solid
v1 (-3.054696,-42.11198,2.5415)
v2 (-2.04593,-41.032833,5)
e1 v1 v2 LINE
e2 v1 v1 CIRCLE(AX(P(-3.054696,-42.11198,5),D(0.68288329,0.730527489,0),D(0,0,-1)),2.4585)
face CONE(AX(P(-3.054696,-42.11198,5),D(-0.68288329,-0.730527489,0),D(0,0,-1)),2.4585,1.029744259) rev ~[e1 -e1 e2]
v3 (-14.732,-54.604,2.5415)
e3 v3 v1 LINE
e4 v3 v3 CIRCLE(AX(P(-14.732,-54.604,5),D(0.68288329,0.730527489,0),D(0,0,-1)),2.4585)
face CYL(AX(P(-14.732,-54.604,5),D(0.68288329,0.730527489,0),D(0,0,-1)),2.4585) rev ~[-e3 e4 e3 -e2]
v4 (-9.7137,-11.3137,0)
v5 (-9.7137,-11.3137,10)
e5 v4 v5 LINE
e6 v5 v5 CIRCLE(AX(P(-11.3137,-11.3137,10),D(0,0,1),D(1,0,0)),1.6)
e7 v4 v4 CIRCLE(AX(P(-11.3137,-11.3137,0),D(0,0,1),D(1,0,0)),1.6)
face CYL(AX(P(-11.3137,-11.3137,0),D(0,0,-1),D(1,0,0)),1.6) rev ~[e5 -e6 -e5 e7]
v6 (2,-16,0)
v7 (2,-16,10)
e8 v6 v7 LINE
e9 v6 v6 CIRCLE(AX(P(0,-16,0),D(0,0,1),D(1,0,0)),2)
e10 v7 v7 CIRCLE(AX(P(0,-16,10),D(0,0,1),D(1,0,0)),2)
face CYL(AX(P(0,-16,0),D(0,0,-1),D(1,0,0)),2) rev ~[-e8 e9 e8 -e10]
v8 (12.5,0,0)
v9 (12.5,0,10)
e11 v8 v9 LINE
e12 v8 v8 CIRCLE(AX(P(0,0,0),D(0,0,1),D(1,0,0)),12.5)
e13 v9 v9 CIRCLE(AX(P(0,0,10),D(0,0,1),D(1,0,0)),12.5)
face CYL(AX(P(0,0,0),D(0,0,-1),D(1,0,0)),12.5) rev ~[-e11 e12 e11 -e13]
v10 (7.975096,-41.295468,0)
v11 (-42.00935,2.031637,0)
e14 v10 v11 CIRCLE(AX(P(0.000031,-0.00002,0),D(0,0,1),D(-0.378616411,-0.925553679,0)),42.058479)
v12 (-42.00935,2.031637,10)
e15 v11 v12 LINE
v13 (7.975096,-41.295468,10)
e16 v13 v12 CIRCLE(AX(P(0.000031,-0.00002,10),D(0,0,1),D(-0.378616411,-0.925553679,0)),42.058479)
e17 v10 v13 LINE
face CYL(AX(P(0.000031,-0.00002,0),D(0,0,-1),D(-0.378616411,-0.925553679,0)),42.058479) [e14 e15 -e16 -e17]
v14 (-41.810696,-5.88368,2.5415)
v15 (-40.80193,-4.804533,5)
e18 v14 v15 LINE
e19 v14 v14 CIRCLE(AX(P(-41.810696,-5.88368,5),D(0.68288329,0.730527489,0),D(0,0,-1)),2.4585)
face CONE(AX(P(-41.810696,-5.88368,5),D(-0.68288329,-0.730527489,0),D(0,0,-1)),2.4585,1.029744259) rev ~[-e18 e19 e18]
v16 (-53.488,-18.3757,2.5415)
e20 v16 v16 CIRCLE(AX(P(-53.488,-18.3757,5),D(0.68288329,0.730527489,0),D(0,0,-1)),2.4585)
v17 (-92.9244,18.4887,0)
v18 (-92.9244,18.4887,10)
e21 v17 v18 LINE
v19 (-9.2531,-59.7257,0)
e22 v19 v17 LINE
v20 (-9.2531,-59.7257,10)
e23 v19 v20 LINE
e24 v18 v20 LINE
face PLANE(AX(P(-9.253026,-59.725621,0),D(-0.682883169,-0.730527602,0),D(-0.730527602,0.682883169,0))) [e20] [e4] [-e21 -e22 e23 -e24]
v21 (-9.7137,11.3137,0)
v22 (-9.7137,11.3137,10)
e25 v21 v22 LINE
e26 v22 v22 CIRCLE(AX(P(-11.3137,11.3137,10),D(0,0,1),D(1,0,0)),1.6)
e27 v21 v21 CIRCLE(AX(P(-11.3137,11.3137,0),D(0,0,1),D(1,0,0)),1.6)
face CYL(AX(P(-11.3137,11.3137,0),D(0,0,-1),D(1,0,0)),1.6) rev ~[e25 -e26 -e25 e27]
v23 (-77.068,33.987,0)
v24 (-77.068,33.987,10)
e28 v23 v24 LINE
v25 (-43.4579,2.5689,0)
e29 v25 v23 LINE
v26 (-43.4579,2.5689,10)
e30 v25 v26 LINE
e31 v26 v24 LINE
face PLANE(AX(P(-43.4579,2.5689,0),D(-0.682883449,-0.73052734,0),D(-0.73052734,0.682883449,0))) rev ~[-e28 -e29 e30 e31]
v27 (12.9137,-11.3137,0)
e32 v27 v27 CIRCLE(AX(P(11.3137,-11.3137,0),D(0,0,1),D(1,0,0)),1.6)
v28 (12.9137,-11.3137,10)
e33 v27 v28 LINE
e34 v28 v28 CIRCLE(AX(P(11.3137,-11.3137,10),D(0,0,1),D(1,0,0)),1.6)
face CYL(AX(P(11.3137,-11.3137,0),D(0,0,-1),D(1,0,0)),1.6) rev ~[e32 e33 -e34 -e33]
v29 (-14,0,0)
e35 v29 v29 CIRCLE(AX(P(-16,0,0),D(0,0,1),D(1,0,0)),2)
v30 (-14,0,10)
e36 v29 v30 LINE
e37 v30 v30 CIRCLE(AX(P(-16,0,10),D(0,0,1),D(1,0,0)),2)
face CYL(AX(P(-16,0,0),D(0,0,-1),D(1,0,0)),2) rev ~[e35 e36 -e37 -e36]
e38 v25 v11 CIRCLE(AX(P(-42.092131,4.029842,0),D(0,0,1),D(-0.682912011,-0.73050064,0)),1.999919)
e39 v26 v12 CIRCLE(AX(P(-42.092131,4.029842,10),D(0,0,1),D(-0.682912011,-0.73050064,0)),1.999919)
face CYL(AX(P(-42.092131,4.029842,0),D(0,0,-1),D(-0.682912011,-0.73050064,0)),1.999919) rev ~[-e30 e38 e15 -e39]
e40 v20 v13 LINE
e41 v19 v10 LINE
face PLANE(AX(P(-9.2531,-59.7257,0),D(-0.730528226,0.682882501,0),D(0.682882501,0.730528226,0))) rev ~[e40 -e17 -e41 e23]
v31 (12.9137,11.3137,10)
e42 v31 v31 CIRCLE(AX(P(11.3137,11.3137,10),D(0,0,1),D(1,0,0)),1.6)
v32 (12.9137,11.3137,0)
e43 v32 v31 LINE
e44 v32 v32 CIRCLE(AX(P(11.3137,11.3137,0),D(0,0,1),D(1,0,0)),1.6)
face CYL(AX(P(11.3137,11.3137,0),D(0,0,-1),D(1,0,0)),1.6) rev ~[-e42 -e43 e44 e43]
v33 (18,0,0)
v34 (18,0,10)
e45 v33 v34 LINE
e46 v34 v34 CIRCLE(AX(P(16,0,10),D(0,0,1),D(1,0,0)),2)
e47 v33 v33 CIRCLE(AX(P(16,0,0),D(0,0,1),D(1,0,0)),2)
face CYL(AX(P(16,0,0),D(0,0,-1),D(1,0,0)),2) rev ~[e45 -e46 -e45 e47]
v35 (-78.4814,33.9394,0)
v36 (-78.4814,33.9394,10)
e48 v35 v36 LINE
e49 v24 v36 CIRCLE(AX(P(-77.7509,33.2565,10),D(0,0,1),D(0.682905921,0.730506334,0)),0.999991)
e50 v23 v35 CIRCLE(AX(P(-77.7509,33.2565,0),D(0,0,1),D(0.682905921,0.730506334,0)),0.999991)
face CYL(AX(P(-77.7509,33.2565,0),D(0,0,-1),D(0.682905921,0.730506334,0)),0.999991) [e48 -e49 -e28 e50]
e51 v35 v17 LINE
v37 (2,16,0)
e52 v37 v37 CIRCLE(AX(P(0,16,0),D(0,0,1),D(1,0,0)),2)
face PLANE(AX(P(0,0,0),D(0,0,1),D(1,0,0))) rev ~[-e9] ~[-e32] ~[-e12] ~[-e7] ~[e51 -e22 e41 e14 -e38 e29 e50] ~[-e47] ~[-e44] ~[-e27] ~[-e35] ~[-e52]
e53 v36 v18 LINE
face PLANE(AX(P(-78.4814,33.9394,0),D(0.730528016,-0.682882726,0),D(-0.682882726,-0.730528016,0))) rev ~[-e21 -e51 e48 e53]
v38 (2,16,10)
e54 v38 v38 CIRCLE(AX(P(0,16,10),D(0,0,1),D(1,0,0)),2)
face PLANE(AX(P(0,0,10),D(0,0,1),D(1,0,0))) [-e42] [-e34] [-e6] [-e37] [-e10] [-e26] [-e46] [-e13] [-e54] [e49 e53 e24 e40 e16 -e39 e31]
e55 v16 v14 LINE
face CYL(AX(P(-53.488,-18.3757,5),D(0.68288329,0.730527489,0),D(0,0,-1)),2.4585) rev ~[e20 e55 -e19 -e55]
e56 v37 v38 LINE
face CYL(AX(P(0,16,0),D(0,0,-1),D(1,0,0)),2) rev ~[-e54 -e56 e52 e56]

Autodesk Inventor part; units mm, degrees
ref_plane "YZ Plane" through (0, 0, 0) normal (1, 0, 0) x (0, 1, 0)
ref_plane "XZ Plane" through (0, 0, 0) normal (0, 1, 0) x (-1, 0, 0)
ref_plane "Work Plane1" through (0, 0, 0) normal (0, 0, 1) x (1, 0, 0)
sketch "Sketch1" plane through (0, 0, 0) normal (0, 0, 1) x (1, 0, 0)
  circle A0 centre (0, 0) radius 12.5 projected
  circle A1 centre (0, -16) radius 2 projected
  circle A2 centre (0, 16) radius 2 projected
  circle A3 centre (-16, 0) radius 2 projected
  circle A4 centre (16, 0) radius 2 projected
  circle A5 centre (11.3137, 11.3137) radius 1.6 projected
  circle A6 centre (-11.3137, -11.3137) radius 1.6 projected
  circle A7 centre (-11.3137, 11.3137) radius 1.6 projected
  circle A8 centre (11.3137, -11.3137) radius 1.6 projected
  circle A9 centre (0, 0) radius 20.7 projected
  line L0 (31.6375, -97.9493) -> (-99.8575, 24.9697) projected
  line L1 (-23.1886, -46.699) -> (-9.2531, -59.7257) projected
  line L2 (15.1663, -37.3207) -> (23.5338, -32.6958) projected
  line L3 (34.2063, -21.2786) -> (38.2573, -12.6186) projected
  line L4 (40.1807, 2.8912) -> (38.3679, 12.2784) projected
  line L5 (30.8075, 25.9567) -> (23.8232, 32.4855) projected
  line L6 (9.6668, 39.1076) -> (0.1789, 40.2842) projected
  line L7 (-15.1663, 37.3207) -> (-23.5338, 32.6958) projected
  line L8 (-34.2063, 21.2786) -> (-38.2573, 12.6186) projected
  line L9 (-45.0314, -26.2807) -> (-35.471, -16.0534) projected
  line L10 (-28.404, -15.8151) -> (-13.8665, -29.4045) projected
  line L11 (-13.6283, -36.4716) -> (-23.1886, -46.699) projected
  circle A10 centre (33.3141, 1.123) radius 2.5 projected
  circle A11 centre (1.123, -33.3141) radius 2.5 projected
  circle A12 centre (0, 0) radius 21 projected
  circle A13 centre (-1.123, 33.3141) radius 2.5 projected
  circle A14 centre (-33.3141, -1.123) radius 2.5 projected
  arc A15 (-15.924, -38.9274) -> (-37.7667, -18.5092) centre (0, 0) ccw
  arc A16 (-28.404, -15.8151) -> (-35.471, -16.0534) centre (-31.8184, -19.4678) ccw
  arc A17 (-13.6283, -36.4716) -> (-13.8665, -29.4045) centre (-17.2809, -33.0572) ccw
  arc A18 (-77.068, 33.987) -> (-78.4814, 33.9394) centre (-77.7509, 33.2565) ccw projected
  line L12 (-78.4814, 33.9394) -> (-92.9244, 18.4887) projected
  line L13 (-92.9244, 18.4887) -> (-45.0314, -26.2807) projected
  arc A19 (-28.404, -15.8151) -> (-35.471, -16.0534) centre (-31.8184, -19.4678) ccw projected
  arc A20 (-13.6283, -36.4716) -> (-13.8665, -29.4045) centre (-17.2809, -33.0572) ccw projected
  line L14 (-9.2531, -59.7257) -> (9.7389, -39.4086) projected
  arc A21 (10.6702, -38.8458) -> (9.7389, -39.4086) centre (11.2, -40.7744) ccw projected
  arc A22 (10.6702, -38.8458) -> (15.1663, -37.3207) centre (0, 0) ccw projected
  arc A23 (23.5338, -32.6958) -> (34.2063, -21.2786) centre (0, 0) ccw projected
  arc A24 (38.2573, -12.6186) -> (40.1807, 2.8912) centre (0, 0) ccw projected
  arc A25 (38.3679, 12.2784) -> (30.8075, 25.9567) centre (0, 0) ccw projected
  arc A26 (23.8232, 32.4855) -> (9.6668, 39.1076) centre (0, 0) ccw projected
  arc A27 (0.1789, 40.2842) -> (-15.1663, 37.3207) centre (0, 0) ccw projected
  arc A28 (-23.5338, 32.6958) -> (-34.2063, 21.2786) centre (0, 0) ccw projected
  arc A29 (-38.2573, 12.6186) -> (-40.1013, 3.8394) centre (0, 0) ccw projected
  arc A30 (-43.4579, 2.5689) -> (-40.1013, 3.8394) centre (-42.0921, 4.03) ccw projected
  line L15 (-43.4579, 2.5689) -> (-77.068, 33.987) projected
  point P0 (0, 0)
  point P1 (7.9751, -41.2954)
  point P2 (36.8098, 20.3458)
  point P3 (-58.967, -13.254)
  point P4 (30.7249, -28.721)
  point P5 (30.7249, -28.721)
  point P6 (7.9751, -41.2954)
  point P7 (41.7388, -5.1762)
  point P8 (41.7388, -5.1762)
  point P9 (-41.7388, 5.1762)
  point P10 (-30.7249, 28.721)
  point P11 (-30.7249, 28.721)
  point P12 (17.8208, 38.0964)
  point P13 (17.8208, 38.0964)
  point P14 (-7.9751, 41.2954)
  point P15 (-7.9751, 41.2954)
  point P16 (7.9751, -41.2954)
  point P17 (-42.0094, 2.0317)
extrude "Extrusion1" add sketch "Sketch1" along normal blind 10 contours A9 | L0 L11 A15 L14 | L0 L9 A16 L10 A17 L11 | L14 A21 A22 L2 A23 L3 A24 L4 A25 L5 A26 L6 A27 L7 A28 L8 A29 A30 A15 | A15 L11 A17 L10 A16 L9 A30 A29 L8 A28 L7 A27 L6 A26 L5 A25 L4 A24 L3 A23 L2 A22 A21 L14 | L0 L12 A18 L15 A30 A15 L9 | A10 | A11 | A12 | A13 | A14
sketch "Sketch2" plane through (-45.0314, -26.2807, 0) normal (-0.6828833, -0.7305275, 0) x (0.7305275, -0.6828833, 0)
  line L0 (-65.5595, 0) -> (48.976, 0) projected
  line L1 (-65.5595, 10) -> (48.976, 10) projected
  line L2 (-65.5595, 0) -> (48.976, 0) projected
  line L3 (48.976, 0) -> (48.976, 10) projected
  line L4 (-65.5595, 10) -> (48.976, 10) projected
  line L5 (-65.5595, 0) -> (-65.5595, 10) projected
  line L6 (48.976, 0) -> (48.976, 10) projected
  line L7 (-65.5595, 0) -> (-65.5595, 10) projected
  point P0 (14.95, 0)
  point P1 (-11.576, 5)
  point P2 (41.476, 5)
  point P3 (-19.076, 5)
  point P4 (29.9, 5)
  point P5 (-8.2917, 10)
  dimension "d10" = 7.5
hole "Hole1" at (-53.488, -18.3757, 5) at (-14.732, -54.604, 5) direction (0.6828833, 0.7305275, 0) diameter 4.917 depth 17.1 tip angle 118 thread size "M6x1" class "6H" standard "ISO Metric profile"
sketch "Sketch3" plane through (0, 0, 10) normal (0, 0, 1) x (1, 0, 0)
  line L0 (-76.3375, 33.3041) -> (-73.606, 36.2263) projected
  line L1 (-48.5774, 7.3546) -> (-76.3375, 33.3041) projected
  line L2 (-45.8459, 10.2767) -> (-48.5774, 7.3546) projected
  line L3 (-45.8459, 10.2767) -> (-73.606, 36.2263) projected
  line L4 (-92.9244, 18.4887) -> (-9.2531, -59.7257) projected
  circle A0 centre (11.3137, -11.3137) radius 1.6 projected
  circle A1 centre (11.3137, 11.3137) radius 1.6 projected
  circle A2 centre (16, 0) radius 2 projected
  circle A3 centre (-16, 0) radius 2 projected
  circle A4 centre (-11.3137, -11.3137) radius 1.6 projected
  circle A5 centre (-11.3137, 11.3137) radius 1.6 projected
  circle A6 centre (0, 16) radius 2 projected
  circle A7 centre (0, -16) radius 2 projected
  circle A8 centre (0, 0) radius 12.5 projected
  line L5 (-41.7388, 5.1762) -> (-58.967, -13.254) projected
  line L6 (31.6375, -97.9493) -> (-99.8575, 24.9697) projected
  line L7 (-75.067, 37.592) -> (-92.9244, 18.4887)
  line L8 (-77.7985, 34.6699) -> (-47.1164, 5.9888)
  line L9 (-47.1164, 5.9888) -> (-43.8411, 2.9271)
  arc A9 (7.9751, -41.2954) -> (-42.0094, 2.0317) centre (0, 0) ccw projected
  arc A10 (-43.4579, 2.5689) -> (-42.0094, 2.0317) centre (-42.0921, 4.03) ccw projected
  line L10 (-43.4579, 2.5689) -> (-77.068, 33.987) projected
  arc A11 (-77.068, 33.987) -> (-78.4814, 33.9394) centre (-77.7509, 33.2565) ccw projected
  line L11 (-78.4814, 33.9394) -> (-92.9244, 18.4887) projected
  line L12 (-9.2531, -59.7257) -> (7.9751, -41.2954) projected
  point P0 (0, 0)
  point P1 (-44.3849, 8.9109)
  point P2 (-45.0314, -26.2807)
  point P3 (-23.1886, -46.699)
extrude "Extrusion2" [suppressed]
equation "\"d10\" = d9"
equation "\"d9\" = 7.5"
properties part number "gearboxFrame" material "Aluminum 6061"
